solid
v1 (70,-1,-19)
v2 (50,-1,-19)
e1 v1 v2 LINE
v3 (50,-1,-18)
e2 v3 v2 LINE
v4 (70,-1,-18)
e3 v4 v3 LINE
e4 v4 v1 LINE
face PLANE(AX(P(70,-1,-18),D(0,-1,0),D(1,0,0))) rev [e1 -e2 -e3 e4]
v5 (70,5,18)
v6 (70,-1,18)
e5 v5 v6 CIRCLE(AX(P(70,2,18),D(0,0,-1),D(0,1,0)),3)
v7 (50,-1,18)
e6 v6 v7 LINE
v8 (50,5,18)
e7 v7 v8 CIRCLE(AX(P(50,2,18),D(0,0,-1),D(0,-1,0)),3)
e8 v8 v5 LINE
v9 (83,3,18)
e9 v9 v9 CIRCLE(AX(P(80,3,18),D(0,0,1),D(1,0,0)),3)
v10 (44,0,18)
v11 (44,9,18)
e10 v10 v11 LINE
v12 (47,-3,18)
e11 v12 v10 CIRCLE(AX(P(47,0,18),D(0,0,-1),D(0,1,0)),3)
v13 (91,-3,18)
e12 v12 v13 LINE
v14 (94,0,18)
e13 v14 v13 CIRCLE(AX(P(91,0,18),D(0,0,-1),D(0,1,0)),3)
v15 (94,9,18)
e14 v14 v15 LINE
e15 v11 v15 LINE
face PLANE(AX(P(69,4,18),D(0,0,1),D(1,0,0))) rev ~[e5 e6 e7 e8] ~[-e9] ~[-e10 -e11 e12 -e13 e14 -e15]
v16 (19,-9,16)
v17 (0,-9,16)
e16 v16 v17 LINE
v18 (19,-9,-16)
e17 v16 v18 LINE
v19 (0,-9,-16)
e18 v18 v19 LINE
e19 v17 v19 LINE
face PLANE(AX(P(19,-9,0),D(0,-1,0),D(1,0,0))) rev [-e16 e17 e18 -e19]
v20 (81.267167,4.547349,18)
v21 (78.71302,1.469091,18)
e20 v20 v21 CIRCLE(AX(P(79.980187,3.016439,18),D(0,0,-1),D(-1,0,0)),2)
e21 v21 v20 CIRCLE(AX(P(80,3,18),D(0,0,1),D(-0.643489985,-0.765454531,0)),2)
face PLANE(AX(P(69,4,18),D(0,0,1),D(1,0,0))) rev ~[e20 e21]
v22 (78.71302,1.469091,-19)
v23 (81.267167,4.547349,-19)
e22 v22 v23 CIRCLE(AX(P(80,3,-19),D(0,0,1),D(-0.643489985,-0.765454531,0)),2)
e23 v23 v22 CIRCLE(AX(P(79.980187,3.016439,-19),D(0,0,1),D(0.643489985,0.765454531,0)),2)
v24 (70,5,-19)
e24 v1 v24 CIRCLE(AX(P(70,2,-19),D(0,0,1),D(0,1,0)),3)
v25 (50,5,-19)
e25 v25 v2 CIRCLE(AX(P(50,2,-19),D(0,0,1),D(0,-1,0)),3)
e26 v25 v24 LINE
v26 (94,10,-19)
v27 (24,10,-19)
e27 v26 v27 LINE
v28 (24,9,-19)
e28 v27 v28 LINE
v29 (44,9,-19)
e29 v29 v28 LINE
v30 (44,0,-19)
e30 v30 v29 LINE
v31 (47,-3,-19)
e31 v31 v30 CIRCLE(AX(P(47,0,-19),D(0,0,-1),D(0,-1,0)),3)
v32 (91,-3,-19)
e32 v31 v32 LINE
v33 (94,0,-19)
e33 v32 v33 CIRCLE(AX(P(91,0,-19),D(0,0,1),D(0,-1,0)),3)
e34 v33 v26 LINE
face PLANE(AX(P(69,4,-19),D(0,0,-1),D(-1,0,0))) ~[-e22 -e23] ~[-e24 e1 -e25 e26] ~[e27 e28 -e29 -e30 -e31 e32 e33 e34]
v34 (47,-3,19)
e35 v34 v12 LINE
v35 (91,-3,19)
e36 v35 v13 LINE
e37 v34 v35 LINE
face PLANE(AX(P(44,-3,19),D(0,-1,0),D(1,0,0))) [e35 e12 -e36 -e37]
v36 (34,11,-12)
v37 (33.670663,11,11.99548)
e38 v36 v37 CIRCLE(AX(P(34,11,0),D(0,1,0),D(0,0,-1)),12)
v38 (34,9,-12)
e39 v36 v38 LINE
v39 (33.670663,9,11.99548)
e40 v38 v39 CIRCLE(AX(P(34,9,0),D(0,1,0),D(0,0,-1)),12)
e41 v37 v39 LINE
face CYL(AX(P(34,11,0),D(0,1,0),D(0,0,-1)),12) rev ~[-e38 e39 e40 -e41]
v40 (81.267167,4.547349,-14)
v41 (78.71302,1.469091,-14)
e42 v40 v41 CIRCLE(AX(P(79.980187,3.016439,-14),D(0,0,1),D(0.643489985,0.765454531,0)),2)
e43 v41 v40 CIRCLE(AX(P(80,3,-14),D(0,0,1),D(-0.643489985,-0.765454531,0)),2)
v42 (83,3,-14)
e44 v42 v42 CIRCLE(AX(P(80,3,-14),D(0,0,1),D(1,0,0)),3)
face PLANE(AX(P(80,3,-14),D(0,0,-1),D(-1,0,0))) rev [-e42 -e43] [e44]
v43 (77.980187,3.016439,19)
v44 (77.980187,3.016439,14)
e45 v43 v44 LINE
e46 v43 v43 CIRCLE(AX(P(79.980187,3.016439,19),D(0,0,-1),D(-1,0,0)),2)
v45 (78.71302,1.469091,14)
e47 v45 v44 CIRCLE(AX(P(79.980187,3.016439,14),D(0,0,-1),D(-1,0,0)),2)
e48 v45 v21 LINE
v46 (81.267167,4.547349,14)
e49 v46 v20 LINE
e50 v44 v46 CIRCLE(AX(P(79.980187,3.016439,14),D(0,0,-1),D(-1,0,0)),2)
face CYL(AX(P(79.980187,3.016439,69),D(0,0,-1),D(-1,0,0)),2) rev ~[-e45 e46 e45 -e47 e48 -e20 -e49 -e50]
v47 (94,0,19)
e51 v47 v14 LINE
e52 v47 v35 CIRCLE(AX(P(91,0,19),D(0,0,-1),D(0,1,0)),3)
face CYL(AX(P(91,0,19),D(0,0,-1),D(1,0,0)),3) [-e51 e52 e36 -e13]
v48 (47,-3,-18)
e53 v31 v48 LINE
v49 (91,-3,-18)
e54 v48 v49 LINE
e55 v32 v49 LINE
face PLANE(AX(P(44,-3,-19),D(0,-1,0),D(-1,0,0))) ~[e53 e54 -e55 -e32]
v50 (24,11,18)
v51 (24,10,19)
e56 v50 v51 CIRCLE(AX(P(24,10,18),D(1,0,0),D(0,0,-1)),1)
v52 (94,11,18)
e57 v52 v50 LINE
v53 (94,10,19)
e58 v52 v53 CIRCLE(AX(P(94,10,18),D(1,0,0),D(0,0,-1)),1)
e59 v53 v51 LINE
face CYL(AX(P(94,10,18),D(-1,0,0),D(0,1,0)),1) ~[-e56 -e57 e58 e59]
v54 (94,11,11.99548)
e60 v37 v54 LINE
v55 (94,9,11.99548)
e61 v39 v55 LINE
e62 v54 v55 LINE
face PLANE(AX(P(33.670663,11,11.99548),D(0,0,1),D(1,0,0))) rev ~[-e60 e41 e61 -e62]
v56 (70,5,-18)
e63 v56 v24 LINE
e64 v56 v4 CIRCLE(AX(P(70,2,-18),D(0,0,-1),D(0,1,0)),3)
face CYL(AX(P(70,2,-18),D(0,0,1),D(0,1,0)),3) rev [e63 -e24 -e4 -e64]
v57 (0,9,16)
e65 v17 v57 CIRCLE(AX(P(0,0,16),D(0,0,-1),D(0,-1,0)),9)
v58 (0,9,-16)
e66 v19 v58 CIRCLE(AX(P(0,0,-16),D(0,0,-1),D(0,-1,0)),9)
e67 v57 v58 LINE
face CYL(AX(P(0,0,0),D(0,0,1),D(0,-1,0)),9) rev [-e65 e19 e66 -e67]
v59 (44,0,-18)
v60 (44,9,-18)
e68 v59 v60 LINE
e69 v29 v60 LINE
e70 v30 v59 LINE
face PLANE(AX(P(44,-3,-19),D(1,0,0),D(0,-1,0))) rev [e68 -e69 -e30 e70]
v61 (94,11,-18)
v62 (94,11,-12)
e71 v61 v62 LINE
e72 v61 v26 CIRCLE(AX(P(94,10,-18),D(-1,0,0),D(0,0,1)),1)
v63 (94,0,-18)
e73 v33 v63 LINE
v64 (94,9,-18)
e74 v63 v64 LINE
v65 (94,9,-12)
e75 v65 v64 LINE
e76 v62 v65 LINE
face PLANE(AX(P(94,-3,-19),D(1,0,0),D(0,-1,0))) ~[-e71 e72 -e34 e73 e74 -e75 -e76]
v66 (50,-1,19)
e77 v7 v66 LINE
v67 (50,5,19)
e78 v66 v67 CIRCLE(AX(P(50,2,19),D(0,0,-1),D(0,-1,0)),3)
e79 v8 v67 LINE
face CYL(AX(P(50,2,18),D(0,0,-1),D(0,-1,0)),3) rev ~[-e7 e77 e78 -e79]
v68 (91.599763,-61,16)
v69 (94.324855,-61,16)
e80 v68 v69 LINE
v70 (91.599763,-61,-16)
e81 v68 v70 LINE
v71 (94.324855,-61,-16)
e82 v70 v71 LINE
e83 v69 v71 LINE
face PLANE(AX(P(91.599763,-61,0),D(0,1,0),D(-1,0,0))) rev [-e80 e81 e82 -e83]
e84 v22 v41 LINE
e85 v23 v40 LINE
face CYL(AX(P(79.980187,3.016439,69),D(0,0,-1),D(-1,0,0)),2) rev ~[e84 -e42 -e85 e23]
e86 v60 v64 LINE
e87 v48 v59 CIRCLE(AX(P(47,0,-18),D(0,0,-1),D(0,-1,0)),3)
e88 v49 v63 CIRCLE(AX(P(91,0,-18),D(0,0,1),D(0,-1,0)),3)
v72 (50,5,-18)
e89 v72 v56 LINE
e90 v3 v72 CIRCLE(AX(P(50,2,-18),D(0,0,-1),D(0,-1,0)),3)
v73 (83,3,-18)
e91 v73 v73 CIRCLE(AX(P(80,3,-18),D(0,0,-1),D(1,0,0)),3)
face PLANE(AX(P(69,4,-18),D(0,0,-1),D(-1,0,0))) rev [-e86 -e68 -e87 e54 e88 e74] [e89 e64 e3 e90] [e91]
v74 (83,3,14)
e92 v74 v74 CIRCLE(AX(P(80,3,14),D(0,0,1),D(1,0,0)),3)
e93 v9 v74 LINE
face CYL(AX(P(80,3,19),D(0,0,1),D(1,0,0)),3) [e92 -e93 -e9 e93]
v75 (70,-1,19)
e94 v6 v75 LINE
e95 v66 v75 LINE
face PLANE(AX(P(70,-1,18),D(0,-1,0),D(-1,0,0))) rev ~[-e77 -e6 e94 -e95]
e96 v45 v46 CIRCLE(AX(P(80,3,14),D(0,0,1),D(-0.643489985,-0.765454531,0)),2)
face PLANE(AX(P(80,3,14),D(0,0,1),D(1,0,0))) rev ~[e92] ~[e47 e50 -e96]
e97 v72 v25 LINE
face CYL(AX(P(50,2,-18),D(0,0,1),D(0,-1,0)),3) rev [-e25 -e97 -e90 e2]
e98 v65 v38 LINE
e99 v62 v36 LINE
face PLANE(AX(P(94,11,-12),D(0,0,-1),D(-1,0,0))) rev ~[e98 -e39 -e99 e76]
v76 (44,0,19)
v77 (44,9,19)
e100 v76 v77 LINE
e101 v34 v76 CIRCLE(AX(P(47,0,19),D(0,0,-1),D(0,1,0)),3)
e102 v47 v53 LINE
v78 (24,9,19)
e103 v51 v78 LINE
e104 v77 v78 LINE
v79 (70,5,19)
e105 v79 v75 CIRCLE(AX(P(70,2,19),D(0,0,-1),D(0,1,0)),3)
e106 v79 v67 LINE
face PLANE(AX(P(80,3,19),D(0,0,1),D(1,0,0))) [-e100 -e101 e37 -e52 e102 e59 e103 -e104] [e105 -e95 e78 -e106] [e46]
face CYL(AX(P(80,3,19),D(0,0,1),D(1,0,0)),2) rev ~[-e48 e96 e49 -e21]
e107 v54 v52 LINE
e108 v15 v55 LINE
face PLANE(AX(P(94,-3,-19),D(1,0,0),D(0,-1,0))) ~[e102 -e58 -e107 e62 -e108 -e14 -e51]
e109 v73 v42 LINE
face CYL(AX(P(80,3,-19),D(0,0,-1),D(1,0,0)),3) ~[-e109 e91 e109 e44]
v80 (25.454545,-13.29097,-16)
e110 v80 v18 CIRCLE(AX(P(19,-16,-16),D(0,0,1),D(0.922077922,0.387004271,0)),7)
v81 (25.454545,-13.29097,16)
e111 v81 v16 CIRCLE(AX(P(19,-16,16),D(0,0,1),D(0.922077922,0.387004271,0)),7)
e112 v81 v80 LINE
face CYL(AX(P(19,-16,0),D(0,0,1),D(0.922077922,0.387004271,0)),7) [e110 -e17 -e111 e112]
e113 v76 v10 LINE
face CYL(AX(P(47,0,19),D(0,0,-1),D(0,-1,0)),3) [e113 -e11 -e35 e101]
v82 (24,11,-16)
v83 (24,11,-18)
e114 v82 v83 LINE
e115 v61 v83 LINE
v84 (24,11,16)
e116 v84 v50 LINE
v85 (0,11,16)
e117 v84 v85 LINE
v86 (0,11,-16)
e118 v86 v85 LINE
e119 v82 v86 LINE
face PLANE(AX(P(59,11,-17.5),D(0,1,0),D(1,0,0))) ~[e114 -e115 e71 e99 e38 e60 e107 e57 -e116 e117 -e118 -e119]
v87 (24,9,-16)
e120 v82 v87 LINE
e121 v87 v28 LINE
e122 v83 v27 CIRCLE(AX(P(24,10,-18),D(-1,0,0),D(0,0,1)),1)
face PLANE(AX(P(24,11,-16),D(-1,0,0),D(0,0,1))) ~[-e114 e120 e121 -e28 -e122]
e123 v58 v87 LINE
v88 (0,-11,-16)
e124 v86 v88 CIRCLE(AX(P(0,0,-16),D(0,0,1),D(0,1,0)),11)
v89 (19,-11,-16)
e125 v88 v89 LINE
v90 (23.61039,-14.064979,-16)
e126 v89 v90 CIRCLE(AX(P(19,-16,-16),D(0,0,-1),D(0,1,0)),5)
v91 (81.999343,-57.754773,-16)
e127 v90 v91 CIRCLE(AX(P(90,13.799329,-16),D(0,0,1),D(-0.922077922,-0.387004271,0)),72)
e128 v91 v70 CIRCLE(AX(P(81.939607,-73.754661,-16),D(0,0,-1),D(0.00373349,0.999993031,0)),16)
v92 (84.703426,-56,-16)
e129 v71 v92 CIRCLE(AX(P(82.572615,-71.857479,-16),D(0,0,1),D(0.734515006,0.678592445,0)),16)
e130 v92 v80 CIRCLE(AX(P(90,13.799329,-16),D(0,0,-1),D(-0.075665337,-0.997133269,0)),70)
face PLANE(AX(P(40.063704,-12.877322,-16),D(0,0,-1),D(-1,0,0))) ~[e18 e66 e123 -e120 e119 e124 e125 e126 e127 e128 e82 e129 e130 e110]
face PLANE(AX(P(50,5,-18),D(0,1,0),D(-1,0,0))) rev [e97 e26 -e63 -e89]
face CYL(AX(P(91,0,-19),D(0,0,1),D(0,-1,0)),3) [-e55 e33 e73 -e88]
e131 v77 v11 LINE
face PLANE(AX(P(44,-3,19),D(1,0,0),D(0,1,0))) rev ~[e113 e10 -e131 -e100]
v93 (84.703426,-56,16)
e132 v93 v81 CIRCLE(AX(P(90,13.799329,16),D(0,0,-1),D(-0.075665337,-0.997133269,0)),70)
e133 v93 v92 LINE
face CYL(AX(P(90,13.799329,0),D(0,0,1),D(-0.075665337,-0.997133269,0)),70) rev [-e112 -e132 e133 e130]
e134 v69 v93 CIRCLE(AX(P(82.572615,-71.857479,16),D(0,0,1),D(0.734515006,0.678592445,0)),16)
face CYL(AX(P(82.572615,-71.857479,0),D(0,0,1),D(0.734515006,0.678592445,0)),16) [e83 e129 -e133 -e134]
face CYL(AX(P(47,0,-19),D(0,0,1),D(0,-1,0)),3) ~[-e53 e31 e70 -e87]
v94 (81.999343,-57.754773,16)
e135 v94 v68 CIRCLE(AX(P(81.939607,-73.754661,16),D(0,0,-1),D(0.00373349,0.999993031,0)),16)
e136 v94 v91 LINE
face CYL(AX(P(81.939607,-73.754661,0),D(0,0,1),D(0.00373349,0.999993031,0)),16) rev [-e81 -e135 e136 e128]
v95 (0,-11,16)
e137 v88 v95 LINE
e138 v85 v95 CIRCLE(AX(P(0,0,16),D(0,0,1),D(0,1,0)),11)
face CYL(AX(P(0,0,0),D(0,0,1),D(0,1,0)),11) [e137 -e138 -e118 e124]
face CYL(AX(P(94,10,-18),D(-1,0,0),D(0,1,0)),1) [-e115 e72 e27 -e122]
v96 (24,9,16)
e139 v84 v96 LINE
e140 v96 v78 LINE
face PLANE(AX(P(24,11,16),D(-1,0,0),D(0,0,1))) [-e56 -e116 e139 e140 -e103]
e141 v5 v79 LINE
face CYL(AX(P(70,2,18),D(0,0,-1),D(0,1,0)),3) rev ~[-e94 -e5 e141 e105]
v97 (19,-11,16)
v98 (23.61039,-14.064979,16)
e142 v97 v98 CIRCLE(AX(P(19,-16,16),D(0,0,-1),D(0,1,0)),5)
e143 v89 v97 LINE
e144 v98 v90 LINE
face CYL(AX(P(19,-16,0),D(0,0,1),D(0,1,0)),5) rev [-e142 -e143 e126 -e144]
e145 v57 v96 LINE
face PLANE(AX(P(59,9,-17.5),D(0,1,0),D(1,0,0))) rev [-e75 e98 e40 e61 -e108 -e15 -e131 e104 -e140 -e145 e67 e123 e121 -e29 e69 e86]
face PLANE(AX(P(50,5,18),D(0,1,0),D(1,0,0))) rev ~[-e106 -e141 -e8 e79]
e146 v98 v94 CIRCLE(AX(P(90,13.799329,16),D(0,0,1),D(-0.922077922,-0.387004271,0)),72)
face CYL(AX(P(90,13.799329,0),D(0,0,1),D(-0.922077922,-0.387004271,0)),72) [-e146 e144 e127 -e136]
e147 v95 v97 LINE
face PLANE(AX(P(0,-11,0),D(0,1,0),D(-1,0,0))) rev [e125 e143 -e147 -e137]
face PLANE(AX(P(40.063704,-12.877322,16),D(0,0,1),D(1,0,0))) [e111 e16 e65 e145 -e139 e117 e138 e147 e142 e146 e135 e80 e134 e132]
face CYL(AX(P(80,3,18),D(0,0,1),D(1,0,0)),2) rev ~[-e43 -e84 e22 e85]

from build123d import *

# Parameters (mm, degrees)
F1_DEPTH  = 16
F2_W      = 70
F2_H      = 3
F3_DEPTH  = 2
F4_W      = 50
F4_H      = 14
F5_DEPTH  = 1
F6_R      = 1
F9_DEPTH  = 2
F11_DEPTH = 1.001
F13_D     = 4
F13_DEPTH = 50
F13_TIP   = 1.2017212381
F14_R     = 3
F14_R_2   = 2
F15_DEPTH = 5
F16_R     = 3
F18_D     = 4
F18_DEPTH = 50
F18_TIP   = 1.2017212381


# Not quite as in the source:
# - a pattern or mirror of a feature is missing from the dataset's text; its kind, count and spacing are read off the source's solid


with BuildPart() as f1:
    # F0 (on Top) → F1 (new body)
    with BuildSketch(Plane.XY):
        with BuildLine():
            Line((94, 11), (0, 11))
            ThreePointArc((0, 11), (-11, 0), (0, -11))
            Line((0, -11), (19, -11))
            ThreePointArc((19, -11), (21.7681124643, -11.8361612201), (23.6103896104, -14.064978646))
            ThreePointArc((23.6103896104, -14.064978646), (46.8644288503, -43.8489365308), (81.9993431207, -57.7547729841))
            ThreePointArc((81.9993431207, -57.7547729841), (87.0632727772, -58.5972193444), (91.5997631119, -61))
            Line((91.5997631119, -61), (94.3248553538, -61))
            ThreePointArc((94.3248553538, -61), (89.9506080698, -57.6601123846), (84.7034264019, -56))
            ThreePointArc((84.7034264019, -56), (49.0672193413, -42.9854179344), (25.4545454545, -13.2909701044))
            ThreePointArc((25.4545454545, -13.2909701044), (22.87535745, -10.1706257081), (19, -9))
            Line((19, -9), (0, -9))
            ThreePointArc((0, -9), (-9, 0), (0, 9))
            Line((0, 9), (94, 9))
            Line((94, 9), (94, 11))
        make_face()
    extrude(amount=F1_DEPTH)

    # F2 (on face) → F3 (join)
    with BuildSketch(Plane(origin=(0, 11, 0), x_dir=(-1, 0, 0), z_dir=(0, 1, 0))):
        with Locations((-59, 17.5)):
            Rectangle(F2_W, F2_H)
    extrude(amount=-F3_DEPTH)

    # F4 (on face) → F5 (join)
    with BuildSketch(Plane.XY.offset(19)):
        with Locations((69, 4)):
            Rectangle(F4_W, F4_H)
    extrude(amount=-F5_DEPTH)

    # F6
    f6_edges = [f1.edges().sort_by_distance(p)[0] for p in [
        (59, 11, 19),
    ]]
    fillet(f6_edges, radius=F6_R)

    # F7: F1 across face


with BuildPart() as f1_1:
    add(f1.part)
    add(f1.part.mirror(Plane(origin=(39.0198924269, -12.8147332924, 0), x_dir=(1, 0, 0), z_dir=(0, 0, -1))))

    # F8 (on face) → F9 (cut)
    with BuildSketch(Plane(origin=(0, 11, 0), x_dir=(-1, 0, 0), z_dir=(0, 1, 0))):
        with BuildLine():
            Line((-94, -12), (-34, -12))
            ThreePointArc((-34, -12), (-22.001130085, -0.1646838272), (-33.6706633635, 11.9954798728))
            Line((-33.6706633635, 11.9954798728), (-34.3293366365, 11.9954798728))
            Line((-34.3293366365, 11.9954798728), (-94, 11.9954798728))
            Line((-94, 11.9954798728), (-94, -12))
        make_face()
    extrude(amount=-F9_DEPTH, mode=Mode.SUBTRACT)

    # F10 (on face) → F11 (cut, through all)
    with BuildSketch(Plane(origin=(0, 0, 18), x_dir=(1, 0, 0), z_dir=(0, 0, -1))):
        with BuildLine():
            ThreePointArc((50, 1), (47, -2), (50, -5))
            Line((50, -5), (70, -5))
            ThreePointArc((70, -5), (73, -2), (70, 1))
            Line((70, 1), (50, 1))
        make_face()
    f11 = extrude(amount=-F11_DEPTH, mode=Mode.SUBTRACT)

    # F11_copies: F11 across plane
    add(f11.mirror(Plane(origin=(0, 0, 0), x_dir=(-1, 0, 0), z_dir=(0, 0, -1))), mode=Mode.SUBTRACT)

    # F13 (one way)
    with BuildSketch(Plane.XY.offset(18)):
        with Locations((80, 3)):
            Circle(F13_D / 2)
    extrude(amount=-F13_DEPTH, mode=Mode.SUBTRACT)
    with Locations(Plane.XY.offset(18)):
        with Locations((80, 3)):
            with Locations((0, 0, -(F13_DEPTH + F13_TIP / 2))):  # 118° drill point
                Cone(0, F13_D / 2, F13_TIP, mode=Mode.SUBTRACT)

    # F14 (on face) → F15 (join)
    with BuildSketch(Plane.XY.offset(19)):
        with Locations((80, 3)):
            Circle(F14_R)
        with Locations((80, 3)):
            Circle(F14_R_2, mode=Mode.SUBTRACT)
    f15 = extrude(amount=-F15_DEPTH)

    # F15_copies: F15 across plane
    add(f15.mirror(Plane(origin=(0, 0, 0), x_dir=(-1, 0, 0), z_dir=(0, 0, -1))))

    # F16
    f16_edges = [f1_1.edges().sort_by_distance(p)[0] for p in [
        (94, -3, 18.5),
        (44, -3, 18.5),
        (44, -3, -18.5),
        (94, -3, -18.5),
    ]]
    fillet(f16_edges, radius=F16_R)

    # F18
    with Locations(Plane.XY.offset(19)):
        with Locations((79.9801871181, 3.0164394993)):
            Hole(F18_D / 2, depth=F18_DEPTH)
            with Locations((0, 0, -(F18_DEPTH + F18_TIP / 2))):  # 118° drill point
                Cone(0, F18_D / 2, F18_TIP, mode=Mode.SUBTRACT)


solid = f1_1.part
